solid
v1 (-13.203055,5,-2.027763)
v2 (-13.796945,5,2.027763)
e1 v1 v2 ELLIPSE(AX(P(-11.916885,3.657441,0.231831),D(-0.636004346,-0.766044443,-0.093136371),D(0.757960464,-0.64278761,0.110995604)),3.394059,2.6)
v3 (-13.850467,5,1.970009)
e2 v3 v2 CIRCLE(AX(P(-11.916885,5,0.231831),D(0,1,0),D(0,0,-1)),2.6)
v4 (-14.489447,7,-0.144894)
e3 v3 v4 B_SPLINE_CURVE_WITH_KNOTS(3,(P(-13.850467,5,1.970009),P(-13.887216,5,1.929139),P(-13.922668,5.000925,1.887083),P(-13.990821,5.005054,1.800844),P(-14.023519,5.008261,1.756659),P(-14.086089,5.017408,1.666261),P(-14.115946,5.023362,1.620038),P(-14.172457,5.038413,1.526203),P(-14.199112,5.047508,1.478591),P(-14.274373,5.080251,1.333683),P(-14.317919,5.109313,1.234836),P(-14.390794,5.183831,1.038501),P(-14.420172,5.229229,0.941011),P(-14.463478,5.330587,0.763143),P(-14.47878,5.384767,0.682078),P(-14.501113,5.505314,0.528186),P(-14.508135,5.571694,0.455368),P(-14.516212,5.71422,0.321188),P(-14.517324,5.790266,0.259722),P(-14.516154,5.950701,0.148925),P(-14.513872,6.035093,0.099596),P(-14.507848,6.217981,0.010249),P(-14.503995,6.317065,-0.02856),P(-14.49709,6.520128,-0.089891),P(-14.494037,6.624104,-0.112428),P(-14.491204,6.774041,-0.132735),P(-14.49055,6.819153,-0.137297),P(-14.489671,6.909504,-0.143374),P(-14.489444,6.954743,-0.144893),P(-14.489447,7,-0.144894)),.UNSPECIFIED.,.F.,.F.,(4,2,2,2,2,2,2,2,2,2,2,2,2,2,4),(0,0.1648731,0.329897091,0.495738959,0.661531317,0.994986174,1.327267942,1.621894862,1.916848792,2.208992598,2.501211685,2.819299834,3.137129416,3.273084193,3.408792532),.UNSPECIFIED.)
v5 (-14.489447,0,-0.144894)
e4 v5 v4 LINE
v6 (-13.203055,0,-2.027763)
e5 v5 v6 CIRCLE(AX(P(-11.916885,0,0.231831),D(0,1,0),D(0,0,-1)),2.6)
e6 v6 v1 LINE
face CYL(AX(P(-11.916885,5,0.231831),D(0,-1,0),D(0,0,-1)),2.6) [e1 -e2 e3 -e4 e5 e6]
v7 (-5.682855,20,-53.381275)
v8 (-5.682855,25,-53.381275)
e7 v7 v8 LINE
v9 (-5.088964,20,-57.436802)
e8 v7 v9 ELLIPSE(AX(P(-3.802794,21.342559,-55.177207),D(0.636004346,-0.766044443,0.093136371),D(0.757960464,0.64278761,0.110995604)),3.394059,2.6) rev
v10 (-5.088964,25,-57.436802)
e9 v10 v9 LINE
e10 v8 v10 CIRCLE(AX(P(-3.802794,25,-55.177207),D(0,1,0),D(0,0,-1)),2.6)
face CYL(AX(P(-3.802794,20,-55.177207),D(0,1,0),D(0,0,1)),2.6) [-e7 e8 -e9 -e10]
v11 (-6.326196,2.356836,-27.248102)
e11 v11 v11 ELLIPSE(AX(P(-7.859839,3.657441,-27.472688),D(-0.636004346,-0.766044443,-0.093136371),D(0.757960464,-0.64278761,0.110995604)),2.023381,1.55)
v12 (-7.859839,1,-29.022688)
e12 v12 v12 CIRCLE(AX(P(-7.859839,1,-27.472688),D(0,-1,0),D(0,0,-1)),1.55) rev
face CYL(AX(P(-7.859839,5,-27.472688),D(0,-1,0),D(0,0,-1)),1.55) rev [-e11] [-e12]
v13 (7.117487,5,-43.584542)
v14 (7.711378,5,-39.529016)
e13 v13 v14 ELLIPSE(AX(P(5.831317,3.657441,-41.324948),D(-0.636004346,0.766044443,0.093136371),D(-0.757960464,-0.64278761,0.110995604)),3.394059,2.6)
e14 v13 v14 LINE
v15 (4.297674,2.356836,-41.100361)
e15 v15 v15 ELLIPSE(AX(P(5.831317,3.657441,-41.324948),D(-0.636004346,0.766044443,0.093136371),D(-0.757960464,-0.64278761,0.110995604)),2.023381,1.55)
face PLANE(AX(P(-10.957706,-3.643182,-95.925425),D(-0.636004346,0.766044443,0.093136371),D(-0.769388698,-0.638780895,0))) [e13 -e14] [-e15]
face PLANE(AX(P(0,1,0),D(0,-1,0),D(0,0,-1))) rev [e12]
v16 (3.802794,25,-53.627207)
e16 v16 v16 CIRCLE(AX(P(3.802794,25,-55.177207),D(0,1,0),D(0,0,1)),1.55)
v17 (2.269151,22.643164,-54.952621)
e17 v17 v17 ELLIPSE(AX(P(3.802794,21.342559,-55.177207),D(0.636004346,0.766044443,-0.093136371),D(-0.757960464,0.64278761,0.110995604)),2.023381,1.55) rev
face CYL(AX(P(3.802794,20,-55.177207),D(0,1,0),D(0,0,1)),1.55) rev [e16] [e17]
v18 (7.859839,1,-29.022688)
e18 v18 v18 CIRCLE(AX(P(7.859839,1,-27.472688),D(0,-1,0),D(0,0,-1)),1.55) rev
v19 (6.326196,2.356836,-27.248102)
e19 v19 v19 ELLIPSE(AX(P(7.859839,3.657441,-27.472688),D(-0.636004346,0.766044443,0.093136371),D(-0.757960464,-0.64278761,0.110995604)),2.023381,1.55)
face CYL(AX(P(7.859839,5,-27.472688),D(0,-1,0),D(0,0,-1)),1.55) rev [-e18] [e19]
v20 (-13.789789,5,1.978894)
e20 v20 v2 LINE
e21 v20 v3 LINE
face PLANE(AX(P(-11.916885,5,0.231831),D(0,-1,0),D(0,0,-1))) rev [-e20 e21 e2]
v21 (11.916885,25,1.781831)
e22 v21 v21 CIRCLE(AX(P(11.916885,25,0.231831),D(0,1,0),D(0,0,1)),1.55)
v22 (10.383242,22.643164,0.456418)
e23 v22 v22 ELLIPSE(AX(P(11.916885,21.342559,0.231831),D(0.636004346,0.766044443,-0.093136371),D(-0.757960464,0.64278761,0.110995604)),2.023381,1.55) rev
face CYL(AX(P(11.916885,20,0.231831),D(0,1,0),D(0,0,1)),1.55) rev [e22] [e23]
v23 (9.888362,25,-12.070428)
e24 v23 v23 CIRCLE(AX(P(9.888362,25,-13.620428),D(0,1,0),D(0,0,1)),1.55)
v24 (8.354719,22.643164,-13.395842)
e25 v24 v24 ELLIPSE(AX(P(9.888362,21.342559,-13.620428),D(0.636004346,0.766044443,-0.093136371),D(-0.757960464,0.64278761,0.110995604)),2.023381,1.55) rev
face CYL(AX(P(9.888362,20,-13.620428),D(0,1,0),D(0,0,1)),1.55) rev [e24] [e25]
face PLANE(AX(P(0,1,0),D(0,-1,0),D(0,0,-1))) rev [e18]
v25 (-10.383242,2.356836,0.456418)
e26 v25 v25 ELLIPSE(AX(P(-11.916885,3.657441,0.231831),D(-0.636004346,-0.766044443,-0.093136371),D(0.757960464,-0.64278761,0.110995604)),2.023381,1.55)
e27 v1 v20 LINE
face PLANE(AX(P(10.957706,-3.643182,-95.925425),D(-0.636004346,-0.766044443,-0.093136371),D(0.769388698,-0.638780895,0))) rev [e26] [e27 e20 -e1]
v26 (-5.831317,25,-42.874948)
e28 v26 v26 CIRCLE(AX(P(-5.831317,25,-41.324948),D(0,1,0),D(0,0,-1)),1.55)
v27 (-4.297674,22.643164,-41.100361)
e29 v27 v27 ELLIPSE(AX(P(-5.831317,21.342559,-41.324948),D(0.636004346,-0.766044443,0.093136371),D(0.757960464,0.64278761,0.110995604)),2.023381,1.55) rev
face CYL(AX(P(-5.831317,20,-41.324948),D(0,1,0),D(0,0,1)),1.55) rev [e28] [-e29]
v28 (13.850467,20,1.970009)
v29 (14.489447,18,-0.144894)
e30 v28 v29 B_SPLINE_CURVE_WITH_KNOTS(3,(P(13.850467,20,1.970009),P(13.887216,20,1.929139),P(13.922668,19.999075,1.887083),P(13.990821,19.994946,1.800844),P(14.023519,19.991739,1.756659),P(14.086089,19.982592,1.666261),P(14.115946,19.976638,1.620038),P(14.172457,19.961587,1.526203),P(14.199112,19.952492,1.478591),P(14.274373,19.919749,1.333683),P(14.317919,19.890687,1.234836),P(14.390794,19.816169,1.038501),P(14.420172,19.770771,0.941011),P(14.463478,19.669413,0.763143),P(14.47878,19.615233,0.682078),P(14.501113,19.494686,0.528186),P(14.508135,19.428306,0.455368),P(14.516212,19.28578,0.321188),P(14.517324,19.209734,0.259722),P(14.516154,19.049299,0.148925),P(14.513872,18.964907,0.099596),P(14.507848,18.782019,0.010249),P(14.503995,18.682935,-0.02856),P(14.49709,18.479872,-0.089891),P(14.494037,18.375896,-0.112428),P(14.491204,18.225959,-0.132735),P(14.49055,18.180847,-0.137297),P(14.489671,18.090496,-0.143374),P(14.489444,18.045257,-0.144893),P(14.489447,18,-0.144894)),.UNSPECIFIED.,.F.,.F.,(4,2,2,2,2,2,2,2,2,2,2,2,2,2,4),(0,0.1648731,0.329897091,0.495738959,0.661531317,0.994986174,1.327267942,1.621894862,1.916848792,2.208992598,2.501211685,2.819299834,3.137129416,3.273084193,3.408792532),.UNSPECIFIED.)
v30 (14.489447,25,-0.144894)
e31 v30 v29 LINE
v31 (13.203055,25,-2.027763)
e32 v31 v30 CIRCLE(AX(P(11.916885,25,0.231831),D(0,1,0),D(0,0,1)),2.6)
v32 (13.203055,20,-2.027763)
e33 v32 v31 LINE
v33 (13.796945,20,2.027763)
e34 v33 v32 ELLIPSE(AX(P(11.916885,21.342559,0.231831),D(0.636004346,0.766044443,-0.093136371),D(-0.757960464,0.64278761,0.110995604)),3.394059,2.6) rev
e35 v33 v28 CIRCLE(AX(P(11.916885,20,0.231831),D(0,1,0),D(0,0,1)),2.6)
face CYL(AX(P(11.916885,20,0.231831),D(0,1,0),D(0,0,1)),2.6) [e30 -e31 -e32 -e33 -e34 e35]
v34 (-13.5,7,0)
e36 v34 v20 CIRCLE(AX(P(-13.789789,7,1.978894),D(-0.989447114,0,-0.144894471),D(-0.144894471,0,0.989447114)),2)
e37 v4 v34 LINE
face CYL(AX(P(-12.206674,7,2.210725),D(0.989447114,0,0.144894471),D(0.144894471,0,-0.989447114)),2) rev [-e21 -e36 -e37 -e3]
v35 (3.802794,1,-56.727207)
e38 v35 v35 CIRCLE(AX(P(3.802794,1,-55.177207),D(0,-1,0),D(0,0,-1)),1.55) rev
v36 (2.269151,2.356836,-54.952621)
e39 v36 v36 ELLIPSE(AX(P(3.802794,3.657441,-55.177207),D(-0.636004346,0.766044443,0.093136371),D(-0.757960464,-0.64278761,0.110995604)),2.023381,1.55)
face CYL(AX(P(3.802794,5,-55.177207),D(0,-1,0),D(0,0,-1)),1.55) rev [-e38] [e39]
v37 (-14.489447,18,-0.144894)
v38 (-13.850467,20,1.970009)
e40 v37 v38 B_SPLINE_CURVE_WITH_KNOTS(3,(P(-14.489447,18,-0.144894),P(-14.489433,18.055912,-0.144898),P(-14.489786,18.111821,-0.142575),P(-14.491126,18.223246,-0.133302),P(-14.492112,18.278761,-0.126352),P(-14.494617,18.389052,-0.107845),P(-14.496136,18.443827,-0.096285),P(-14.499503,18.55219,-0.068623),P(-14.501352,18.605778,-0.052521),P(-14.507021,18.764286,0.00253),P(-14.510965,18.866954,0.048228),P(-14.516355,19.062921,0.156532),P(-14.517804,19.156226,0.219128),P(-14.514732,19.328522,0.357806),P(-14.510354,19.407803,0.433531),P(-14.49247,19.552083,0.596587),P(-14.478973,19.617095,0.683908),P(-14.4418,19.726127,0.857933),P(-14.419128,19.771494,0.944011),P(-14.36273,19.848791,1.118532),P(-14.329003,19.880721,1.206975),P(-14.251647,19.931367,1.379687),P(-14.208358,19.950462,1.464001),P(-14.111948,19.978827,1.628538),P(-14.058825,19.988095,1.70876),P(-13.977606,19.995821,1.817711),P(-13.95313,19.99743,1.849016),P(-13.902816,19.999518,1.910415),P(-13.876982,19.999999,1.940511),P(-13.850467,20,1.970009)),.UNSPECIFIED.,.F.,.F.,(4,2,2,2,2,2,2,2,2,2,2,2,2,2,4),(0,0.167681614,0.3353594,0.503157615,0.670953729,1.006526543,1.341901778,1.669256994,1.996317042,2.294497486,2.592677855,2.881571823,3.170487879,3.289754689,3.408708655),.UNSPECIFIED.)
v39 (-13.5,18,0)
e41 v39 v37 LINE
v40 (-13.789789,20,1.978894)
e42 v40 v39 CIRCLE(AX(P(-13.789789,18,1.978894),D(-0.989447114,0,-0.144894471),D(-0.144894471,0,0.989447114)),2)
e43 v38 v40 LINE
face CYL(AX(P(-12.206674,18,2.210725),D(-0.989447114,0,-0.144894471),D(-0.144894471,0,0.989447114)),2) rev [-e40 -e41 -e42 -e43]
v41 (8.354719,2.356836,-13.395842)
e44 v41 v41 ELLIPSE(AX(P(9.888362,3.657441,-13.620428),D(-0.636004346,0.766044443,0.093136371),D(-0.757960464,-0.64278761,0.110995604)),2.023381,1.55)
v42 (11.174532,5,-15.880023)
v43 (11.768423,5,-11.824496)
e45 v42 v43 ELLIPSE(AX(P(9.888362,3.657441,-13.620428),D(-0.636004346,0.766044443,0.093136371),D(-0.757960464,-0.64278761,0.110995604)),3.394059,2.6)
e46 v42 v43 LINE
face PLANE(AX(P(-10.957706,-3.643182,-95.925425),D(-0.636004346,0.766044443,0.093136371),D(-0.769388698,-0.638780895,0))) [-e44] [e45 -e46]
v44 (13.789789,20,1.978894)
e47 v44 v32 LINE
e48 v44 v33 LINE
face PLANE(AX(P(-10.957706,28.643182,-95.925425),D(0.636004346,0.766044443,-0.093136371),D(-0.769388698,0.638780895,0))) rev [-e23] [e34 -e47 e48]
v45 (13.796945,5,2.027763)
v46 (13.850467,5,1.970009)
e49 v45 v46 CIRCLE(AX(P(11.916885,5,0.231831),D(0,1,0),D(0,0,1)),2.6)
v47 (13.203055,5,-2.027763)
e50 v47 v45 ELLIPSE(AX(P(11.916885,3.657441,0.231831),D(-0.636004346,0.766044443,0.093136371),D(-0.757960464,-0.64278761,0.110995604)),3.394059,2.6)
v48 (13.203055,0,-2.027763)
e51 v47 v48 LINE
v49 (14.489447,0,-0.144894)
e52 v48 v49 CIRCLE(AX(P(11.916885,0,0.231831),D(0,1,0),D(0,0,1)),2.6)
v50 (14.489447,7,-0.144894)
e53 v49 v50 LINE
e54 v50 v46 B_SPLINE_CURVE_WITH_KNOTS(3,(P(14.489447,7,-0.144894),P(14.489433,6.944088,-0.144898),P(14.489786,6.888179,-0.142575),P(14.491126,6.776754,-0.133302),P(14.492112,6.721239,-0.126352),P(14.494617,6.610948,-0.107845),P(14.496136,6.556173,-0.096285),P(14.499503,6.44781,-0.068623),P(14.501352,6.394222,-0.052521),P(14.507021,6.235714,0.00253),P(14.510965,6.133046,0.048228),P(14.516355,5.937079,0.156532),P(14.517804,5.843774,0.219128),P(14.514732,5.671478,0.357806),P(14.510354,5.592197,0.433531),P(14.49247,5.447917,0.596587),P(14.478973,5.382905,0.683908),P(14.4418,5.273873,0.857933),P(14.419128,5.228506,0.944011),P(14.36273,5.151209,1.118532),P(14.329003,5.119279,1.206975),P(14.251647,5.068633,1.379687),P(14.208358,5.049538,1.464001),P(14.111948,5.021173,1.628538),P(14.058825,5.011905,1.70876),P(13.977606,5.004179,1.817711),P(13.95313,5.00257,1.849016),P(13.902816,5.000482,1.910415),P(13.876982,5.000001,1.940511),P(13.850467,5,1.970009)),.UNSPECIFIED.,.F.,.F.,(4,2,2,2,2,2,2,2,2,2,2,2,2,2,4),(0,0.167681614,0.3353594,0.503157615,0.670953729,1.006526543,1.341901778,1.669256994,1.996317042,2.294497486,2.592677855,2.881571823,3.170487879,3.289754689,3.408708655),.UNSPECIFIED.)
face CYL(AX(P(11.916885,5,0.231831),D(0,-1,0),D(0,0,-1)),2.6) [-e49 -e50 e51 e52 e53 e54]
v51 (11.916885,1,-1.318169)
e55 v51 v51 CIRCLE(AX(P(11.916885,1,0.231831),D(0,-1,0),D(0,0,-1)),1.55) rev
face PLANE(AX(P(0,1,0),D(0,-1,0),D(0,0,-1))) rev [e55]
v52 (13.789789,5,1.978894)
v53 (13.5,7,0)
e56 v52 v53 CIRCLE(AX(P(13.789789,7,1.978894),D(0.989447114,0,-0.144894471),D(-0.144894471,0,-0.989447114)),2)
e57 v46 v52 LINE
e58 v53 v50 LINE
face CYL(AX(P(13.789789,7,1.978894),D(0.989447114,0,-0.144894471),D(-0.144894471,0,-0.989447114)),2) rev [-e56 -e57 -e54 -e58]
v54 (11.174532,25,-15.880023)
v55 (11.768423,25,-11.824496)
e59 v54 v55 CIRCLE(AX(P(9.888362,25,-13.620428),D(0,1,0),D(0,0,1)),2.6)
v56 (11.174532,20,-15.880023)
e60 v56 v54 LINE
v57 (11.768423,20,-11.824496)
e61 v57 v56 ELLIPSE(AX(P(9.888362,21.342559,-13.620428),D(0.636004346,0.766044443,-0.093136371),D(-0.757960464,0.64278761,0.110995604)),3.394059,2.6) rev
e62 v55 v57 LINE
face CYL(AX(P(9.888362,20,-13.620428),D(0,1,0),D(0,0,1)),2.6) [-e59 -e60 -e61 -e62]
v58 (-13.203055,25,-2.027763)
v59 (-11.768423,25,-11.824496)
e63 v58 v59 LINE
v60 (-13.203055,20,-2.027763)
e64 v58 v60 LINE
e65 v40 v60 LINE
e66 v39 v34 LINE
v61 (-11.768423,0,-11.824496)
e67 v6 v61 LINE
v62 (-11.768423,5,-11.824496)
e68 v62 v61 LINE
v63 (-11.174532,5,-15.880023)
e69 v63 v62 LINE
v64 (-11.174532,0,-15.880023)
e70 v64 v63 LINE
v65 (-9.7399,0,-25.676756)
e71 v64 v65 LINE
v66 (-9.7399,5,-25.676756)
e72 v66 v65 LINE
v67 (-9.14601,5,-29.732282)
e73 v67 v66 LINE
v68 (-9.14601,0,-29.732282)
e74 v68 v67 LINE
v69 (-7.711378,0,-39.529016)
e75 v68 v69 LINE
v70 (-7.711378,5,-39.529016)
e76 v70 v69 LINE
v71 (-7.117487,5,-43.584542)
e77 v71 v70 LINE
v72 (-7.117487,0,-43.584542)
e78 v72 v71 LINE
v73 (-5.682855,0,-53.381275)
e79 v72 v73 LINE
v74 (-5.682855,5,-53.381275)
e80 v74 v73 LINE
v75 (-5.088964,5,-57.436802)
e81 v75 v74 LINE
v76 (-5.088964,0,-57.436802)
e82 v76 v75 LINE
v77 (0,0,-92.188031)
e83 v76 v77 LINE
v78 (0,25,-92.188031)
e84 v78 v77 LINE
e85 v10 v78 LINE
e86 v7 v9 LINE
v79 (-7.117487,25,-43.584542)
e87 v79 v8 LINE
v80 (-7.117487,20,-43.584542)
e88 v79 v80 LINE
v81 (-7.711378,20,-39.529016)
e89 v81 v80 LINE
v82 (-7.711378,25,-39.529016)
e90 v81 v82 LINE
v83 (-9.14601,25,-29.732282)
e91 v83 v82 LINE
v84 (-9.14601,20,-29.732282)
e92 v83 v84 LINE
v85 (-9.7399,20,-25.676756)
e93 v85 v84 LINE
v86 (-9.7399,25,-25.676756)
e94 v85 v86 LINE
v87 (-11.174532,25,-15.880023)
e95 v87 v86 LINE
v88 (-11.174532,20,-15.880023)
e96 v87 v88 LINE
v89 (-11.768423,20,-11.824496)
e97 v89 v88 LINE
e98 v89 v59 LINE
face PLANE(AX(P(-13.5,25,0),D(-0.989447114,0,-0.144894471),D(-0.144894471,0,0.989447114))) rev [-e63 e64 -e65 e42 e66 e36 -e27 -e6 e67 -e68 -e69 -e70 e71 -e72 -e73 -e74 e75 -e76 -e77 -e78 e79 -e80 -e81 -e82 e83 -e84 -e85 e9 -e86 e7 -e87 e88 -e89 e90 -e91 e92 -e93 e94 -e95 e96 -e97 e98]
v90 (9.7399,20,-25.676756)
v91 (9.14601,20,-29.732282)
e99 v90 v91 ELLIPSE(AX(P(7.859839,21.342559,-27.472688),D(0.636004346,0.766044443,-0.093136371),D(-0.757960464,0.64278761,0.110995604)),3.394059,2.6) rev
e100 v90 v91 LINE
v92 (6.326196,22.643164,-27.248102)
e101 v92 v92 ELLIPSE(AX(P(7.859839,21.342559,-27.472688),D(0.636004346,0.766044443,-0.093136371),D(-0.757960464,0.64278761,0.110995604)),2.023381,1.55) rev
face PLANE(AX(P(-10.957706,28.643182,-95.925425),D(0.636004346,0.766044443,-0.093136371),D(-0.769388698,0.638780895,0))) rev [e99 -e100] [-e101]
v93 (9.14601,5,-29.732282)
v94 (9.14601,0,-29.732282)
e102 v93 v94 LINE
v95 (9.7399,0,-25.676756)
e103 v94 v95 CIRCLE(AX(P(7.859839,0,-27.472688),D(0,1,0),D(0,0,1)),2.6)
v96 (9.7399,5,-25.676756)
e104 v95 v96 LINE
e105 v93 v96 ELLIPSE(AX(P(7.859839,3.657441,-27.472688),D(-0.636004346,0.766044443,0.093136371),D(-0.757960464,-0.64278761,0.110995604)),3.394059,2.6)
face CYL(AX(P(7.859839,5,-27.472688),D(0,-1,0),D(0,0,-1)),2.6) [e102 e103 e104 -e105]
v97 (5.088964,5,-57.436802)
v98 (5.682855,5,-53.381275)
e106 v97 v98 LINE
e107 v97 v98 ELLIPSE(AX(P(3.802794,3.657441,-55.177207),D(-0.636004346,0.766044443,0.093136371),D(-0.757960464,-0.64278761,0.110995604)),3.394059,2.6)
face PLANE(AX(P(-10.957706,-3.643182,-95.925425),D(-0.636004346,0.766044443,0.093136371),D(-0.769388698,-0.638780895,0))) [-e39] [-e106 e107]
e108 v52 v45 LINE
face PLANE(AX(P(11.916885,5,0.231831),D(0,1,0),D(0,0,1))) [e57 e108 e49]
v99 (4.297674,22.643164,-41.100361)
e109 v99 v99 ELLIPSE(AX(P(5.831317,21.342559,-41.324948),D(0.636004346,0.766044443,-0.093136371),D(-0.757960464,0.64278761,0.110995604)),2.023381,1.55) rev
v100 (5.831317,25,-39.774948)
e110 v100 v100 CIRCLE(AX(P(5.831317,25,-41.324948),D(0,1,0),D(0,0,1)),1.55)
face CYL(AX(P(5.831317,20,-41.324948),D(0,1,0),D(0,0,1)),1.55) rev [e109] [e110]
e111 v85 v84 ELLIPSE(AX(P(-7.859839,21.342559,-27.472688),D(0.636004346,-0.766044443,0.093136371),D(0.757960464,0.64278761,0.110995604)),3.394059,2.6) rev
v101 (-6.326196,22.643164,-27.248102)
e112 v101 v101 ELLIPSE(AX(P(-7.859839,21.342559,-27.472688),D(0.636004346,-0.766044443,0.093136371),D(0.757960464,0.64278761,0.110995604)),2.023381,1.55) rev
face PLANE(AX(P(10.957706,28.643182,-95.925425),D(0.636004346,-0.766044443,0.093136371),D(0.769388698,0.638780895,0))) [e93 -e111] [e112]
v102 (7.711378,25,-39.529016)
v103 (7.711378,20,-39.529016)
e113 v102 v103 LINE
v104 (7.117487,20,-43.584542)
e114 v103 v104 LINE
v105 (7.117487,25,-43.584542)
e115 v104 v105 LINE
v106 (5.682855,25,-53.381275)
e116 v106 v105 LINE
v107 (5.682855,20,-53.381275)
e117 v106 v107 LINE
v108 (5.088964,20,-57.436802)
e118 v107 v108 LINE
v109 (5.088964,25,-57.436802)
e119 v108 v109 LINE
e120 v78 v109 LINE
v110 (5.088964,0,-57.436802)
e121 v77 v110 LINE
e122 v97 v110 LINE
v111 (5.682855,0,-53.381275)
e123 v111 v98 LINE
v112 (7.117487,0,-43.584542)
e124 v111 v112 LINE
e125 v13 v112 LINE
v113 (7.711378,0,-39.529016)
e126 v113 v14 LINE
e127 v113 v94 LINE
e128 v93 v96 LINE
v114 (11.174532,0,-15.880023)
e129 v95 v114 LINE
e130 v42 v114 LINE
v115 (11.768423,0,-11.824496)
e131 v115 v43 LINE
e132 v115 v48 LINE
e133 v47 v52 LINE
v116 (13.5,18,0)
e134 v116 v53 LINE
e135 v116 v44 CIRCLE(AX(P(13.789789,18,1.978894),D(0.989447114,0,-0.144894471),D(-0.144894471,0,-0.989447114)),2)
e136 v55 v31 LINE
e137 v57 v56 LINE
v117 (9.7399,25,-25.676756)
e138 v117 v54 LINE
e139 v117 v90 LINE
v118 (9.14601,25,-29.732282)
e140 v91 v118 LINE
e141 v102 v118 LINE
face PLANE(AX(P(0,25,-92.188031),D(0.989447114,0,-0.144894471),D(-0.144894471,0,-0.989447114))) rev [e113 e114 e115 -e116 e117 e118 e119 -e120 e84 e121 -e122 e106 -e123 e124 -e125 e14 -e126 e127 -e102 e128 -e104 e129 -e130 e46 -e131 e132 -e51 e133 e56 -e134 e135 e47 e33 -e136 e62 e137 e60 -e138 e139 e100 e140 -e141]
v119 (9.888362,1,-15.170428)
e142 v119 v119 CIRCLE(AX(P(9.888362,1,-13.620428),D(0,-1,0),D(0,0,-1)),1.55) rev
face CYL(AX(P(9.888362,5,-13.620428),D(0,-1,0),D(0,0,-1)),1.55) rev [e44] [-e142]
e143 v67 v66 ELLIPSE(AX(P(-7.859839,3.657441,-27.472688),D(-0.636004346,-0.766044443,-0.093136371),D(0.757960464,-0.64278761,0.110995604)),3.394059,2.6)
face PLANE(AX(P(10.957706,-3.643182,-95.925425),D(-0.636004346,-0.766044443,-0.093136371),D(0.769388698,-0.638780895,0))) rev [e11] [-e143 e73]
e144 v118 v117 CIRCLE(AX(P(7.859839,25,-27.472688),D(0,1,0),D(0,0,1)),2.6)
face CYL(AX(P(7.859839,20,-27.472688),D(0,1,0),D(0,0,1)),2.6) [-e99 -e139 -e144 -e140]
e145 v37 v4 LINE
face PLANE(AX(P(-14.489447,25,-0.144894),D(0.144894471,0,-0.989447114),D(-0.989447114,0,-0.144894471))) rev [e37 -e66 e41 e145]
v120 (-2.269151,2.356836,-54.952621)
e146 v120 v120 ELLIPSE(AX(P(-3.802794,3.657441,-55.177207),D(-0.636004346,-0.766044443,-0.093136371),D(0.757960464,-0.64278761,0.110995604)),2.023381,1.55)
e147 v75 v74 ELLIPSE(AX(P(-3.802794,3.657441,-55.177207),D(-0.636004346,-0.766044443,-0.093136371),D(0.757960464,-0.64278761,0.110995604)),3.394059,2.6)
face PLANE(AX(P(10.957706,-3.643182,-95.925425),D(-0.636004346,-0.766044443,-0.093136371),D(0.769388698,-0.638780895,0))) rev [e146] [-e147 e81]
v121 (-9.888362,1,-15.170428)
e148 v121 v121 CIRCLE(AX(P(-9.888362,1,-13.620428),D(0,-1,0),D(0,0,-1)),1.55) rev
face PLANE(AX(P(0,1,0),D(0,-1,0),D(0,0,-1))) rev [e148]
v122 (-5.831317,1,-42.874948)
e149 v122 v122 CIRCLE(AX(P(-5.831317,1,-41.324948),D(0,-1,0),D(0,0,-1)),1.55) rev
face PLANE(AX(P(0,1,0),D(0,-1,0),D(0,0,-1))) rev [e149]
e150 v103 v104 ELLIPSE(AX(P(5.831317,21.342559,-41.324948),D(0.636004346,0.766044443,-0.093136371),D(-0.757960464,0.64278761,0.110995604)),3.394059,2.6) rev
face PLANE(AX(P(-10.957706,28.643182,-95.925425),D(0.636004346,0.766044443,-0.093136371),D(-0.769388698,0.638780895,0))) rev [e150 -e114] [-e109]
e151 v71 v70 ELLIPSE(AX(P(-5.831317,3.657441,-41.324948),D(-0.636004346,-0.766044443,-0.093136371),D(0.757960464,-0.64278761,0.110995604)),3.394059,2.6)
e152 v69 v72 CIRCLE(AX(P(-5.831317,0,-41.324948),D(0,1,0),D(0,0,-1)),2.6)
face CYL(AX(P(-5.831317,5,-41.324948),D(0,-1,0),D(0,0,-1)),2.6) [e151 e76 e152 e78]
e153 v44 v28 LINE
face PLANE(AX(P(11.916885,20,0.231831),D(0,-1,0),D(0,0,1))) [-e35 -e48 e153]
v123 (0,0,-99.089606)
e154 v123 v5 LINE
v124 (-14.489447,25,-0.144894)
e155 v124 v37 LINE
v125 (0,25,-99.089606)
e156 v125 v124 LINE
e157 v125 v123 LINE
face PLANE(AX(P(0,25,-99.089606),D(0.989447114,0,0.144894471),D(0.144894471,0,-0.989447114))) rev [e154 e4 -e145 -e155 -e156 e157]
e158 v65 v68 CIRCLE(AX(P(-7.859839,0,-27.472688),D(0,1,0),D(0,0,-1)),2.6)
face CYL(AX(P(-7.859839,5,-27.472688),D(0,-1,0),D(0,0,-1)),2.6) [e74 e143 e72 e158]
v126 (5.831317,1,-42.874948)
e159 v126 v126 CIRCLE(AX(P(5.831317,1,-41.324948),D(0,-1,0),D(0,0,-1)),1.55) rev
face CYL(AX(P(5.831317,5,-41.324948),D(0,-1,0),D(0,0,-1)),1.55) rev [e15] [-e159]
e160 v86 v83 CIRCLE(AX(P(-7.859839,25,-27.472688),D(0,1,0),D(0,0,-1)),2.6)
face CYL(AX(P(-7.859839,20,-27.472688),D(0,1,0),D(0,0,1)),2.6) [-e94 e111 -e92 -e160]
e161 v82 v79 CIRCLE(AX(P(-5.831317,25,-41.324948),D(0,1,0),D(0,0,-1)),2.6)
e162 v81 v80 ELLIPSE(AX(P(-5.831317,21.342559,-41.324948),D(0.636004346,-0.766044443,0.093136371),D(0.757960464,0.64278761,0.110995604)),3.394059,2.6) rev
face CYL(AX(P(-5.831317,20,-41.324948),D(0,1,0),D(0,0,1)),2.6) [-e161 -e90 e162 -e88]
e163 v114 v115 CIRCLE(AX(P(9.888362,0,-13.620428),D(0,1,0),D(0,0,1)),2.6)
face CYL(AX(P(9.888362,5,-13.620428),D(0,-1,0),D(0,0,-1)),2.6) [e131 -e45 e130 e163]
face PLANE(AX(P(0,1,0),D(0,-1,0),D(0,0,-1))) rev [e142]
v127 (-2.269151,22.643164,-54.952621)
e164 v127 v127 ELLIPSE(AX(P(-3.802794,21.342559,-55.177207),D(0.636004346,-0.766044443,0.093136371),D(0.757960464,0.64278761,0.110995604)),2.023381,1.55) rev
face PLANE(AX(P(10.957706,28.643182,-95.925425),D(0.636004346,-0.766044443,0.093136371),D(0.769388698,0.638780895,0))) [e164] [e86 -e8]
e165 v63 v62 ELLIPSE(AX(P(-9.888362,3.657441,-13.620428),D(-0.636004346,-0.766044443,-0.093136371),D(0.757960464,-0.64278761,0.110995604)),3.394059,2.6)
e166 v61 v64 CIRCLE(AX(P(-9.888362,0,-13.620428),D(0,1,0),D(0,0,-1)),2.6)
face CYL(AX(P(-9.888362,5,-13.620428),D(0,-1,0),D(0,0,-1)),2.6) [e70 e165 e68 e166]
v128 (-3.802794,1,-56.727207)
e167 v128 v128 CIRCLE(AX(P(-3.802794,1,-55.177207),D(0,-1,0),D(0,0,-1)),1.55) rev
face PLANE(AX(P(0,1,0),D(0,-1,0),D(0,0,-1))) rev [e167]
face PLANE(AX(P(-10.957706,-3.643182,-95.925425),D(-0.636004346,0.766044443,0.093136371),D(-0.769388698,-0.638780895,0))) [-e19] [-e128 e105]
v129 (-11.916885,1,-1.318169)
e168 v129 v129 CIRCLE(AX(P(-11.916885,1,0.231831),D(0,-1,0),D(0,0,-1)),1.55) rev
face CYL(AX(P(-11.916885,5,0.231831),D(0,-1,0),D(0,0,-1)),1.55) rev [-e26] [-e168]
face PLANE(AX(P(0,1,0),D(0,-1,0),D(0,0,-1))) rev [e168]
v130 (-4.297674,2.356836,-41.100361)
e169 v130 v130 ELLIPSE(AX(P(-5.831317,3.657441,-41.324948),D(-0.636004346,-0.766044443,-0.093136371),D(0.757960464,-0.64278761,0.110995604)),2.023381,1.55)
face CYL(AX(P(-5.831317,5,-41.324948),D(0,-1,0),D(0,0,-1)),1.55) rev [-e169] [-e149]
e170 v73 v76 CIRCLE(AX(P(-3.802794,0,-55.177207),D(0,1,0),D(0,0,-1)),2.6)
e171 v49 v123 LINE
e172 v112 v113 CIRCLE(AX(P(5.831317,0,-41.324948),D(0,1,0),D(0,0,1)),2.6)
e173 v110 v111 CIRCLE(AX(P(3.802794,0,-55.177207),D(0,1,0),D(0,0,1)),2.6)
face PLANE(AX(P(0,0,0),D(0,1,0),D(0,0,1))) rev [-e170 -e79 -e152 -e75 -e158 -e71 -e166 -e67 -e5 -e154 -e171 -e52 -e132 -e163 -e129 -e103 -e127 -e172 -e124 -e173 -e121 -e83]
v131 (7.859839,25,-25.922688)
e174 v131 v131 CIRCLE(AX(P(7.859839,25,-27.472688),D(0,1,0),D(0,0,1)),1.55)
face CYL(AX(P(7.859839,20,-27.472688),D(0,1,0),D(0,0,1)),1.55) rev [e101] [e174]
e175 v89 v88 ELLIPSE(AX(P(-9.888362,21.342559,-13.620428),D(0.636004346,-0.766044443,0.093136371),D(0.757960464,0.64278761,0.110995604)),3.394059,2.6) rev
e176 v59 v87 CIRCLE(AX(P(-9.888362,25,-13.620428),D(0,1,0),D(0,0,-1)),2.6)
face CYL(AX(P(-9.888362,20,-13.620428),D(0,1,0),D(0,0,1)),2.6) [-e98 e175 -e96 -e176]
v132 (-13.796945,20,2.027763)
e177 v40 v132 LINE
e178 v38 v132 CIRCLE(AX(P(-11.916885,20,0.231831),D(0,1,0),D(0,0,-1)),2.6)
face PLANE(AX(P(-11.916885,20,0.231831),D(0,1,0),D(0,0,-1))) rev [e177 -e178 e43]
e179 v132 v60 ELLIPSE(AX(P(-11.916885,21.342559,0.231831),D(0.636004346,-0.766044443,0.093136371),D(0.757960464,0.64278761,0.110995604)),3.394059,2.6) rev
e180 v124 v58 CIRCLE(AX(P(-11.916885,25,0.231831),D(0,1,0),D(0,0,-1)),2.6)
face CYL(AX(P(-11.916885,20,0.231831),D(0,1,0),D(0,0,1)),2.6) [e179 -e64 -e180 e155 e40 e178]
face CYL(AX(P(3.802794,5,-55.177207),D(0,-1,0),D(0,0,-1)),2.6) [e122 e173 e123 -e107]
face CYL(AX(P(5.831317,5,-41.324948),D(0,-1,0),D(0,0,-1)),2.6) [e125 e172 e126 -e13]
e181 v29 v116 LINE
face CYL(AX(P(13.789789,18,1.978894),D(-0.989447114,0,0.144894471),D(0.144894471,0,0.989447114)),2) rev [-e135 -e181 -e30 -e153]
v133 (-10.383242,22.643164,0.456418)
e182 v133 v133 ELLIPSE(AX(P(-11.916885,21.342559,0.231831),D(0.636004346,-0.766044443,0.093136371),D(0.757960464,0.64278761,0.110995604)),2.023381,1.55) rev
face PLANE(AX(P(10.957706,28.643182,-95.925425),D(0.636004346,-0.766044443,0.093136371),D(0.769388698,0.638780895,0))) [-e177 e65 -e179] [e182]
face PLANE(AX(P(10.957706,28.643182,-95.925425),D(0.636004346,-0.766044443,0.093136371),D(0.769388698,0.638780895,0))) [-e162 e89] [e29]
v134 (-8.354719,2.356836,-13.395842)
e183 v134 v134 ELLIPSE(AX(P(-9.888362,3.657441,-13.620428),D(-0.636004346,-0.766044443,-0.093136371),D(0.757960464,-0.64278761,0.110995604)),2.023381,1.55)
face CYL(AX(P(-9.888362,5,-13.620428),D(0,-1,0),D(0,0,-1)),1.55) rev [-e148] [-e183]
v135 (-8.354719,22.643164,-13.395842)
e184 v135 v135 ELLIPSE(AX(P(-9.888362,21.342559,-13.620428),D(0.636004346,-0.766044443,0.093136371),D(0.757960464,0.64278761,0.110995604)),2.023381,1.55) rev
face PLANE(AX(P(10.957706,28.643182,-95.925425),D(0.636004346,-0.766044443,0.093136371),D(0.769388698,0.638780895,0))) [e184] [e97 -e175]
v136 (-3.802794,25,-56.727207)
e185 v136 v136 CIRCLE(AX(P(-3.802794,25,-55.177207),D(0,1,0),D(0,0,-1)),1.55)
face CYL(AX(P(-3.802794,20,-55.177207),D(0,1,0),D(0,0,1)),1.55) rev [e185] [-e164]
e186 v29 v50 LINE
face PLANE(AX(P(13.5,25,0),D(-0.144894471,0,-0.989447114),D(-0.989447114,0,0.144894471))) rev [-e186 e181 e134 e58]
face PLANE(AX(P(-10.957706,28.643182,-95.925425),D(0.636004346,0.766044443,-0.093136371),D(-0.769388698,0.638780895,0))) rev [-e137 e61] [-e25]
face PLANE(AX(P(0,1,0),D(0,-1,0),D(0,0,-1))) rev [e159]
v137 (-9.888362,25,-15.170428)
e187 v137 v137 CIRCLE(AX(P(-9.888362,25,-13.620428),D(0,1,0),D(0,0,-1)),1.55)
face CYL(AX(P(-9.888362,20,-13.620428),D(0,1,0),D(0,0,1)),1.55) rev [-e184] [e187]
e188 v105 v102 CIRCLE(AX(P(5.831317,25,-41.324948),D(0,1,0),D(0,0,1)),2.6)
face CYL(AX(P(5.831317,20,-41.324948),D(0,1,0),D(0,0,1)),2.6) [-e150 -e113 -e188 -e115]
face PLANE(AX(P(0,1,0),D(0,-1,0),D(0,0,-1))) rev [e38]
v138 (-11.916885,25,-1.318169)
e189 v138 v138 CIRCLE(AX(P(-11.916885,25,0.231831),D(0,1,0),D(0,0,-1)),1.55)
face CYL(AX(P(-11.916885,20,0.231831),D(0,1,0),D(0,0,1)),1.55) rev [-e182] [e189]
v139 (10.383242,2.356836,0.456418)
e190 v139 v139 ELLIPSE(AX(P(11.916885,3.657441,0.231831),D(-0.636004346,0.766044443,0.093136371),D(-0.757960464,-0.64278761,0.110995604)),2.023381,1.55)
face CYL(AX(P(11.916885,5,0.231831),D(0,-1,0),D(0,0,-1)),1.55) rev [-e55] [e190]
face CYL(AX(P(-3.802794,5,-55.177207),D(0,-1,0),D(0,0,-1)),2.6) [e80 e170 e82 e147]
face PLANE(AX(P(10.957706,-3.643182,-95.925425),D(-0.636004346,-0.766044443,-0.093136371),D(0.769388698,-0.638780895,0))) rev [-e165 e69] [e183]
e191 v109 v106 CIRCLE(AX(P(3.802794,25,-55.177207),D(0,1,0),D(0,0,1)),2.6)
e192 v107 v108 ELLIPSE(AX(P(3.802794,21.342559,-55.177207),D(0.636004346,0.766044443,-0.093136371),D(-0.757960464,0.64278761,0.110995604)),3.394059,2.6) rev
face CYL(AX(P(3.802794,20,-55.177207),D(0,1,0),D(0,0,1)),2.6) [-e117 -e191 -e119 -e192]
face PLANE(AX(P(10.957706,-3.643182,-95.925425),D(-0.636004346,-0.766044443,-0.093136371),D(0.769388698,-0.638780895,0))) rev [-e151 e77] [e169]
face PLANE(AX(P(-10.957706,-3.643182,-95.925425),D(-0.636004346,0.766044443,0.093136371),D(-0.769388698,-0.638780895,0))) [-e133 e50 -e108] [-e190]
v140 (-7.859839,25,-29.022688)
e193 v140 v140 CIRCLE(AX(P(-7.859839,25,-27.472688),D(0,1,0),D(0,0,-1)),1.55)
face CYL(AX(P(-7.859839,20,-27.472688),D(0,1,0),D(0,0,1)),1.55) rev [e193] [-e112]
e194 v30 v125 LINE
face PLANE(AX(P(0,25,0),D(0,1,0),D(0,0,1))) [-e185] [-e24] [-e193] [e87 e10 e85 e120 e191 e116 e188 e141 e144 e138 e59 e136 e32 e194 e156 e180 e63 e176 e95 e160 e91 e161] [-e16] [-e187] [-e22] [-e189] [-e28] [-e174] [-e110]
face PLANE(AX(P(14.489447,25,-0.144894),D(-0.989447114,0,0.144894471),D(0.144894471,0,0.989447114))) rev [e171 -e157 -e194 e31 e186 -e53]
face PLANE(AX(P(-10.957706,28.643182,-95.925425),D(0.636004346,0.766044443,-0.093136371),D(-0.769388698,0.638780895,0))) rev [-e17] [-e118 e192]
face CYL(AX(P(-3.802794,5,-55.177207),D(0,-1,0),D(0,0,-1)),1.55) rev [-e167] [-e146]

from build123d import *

# Parameters (mm, degrees)
BOSS_EXTRUDE1_DEPTH            = 25
SKETCH2_R                      = 2.6
SKETCH2_R_2                    = 1.55
BOSS_EXTRUDE3_DEPTH            = 5
CUT_EXTRUDE1_REACH             = 107.119
CUT_EXTRUDE1_DIRECTION_2_DEPTH = 106.119492302
CUT_EXTRUDE2_REACH             = 107.119
CUT_EXTRUDE2_DIRECTION_2_DEPTH = 106.119492302
FILLET1_R                      = 2
SKETCH6_R                      = 1.55
BOSS_EXTRUDE4_DEPTH            = 1


with BuildPart() as part:
    # Sketch1 → Boss-Extrude1 (new body)
    with BuildSketch(Plane(origin=(0, 0, 0), x_dir=(1, 0, 0), z_dir=(0, 1, 0))):
        Polygon((-13.5, 0), (0, 92.188031325), (13.5, 0), (14.489447114, 0.144894471), (0, 99.089605913), (-14.489447114, 0.144894471), align=None)
    extrude(amount=BOSS_EXTRUDE1_DEPTH)

    # Sketch2 → Boss-Extrude3 (add)
    # profile 1 of 10: a face of its own
    with BuildSketch(Plane(origin=(0, 0, 0), x_dir=(1, 0, 0), z_dir=(0, 1, 0))):
        with Locations((11.916884617, -0.231831154)):
            Circle(SKETCH2_R)
        with Locations(Location((11.916884617, -0.231831154, 0), (0, 0, 270))):
            Circle(SKETCH2_R_2, mode=Mode.SUBTRACT)
    # profile 2 of 10: a face of its own
    with BuildSketch(Plane(origin=(0, 0, 0), x_dir=(1, 0, 0), z_dir=(0, 1, 0))):
        with Locations((9.888362021, 13.620428448)):
            Circle(SKETCH2_R)
        with Locations(Location((9.888362021, 13.620428448, 0), (0, 0, 270))):
            Circle(SKETCH2_R_2, mode=Mode.SUBTRACT)
    # profile 3 of 10: a face of its own
    with BuildSketch(Plane(origin=(0, 0, 0), x_dir=(1, 0, 0), z_dir=(0, 1, 0))):
        with Locations((7.859839425, 27.47268805)):
            Circle(SKETCH2_R)
        with Locations(Location((7.859839425, 27.47268805, 0), (0, 0, 270))):
            Circle(SKETCH2_R_2, mode=Mode.SUBTRACT)
    # profile 4 of 10: a face of its own
    with BuildSketch(Plane(origin=(0, 0, 0), x_dir=(1, 0, 0), z_dir=(0, 1, 0))):
        with Locations((5.831316829, 41.324947652)):
            Circle(SKETCH2_R)
        with Locations(Location((5.831316829, 41.324947652, 0), (0, 0, 270))):
            Circle(SKETCH2_R_2, mode=Mode.SUBTRACT)
    # profile 5 of 10: a face of its own
    with BuildSketch(Plane(origin=(0, 0, 0), x_dir=(1, 0, 0), z_dir=(0, 1, 0))):
        with Locations((3.802794233, 55.177207254)):
            Circle(SKETCH2_R)
        with Locations(Location((3.802794233, 55.177207254, 0), (0, 0, 270))):
            Circle(SKETCH2_R_2, mode=Mode.SUBTRACT)
    # profile 6 of 10: a face of its own
    with BuildSketch(Plane(origin=(0, 0, 0), x_dir=(1, 0, 0), z_dir=(0, 1, 0))):
        with Locations((-11.916884617, -0.231831154)):
            Circle(SKETCH2_R)
        with Locations(Location((-11.916884617, -0.231831154, 0), (0, 0, 90))):
            Circle(SKETCH2_R_2, mode=Mode.SUBTRACT)
    # profile 7 of 10: a face of its own
    with BuildSketch(Plane(origin=(0, 0, 0), x_dir=(1, 0, 0), z_dir=(0, 1, 0))):
        with Locations((-9.888362021, 13.620428448)):
            Circle(SKETCH2_R)
        with Locations(Location((-9.888362021, 13.620428448, 0), (0, 0, 90))):
            Circle(SKETCH2_R_2, mode=Mode.SUBTRACT)
    # profile 8 of 10: a face of its own
    with BuildSketch(Plane(origin=(0, 0, 0), x_dir=(1, 0, 0), z_dir=(0, 1, 0))):
        with Locations((-7.859839425, 27.47268805)):
            Circle(SKETCH2_R)
        with Locations(Location((-7.859839425, 27.47268805, 0), (0, 0, 90))):
            Circle(SKETCH2_R_2, mode=Mode.SUBTRACT)
    # profile 9 of 10: a face of its own
    with BuildSketch(Plane(origin=(0, 0, 0), x_dir=(1, 0, 0), z_dir=(0, 1, 0))):
        with Locations((-5.831316829, 41.324947652)):
            Circle(SKETCH2_R)
        with Locations(Location((-5.831316829, 41.324947652, 0), (0, 0, 90))):
            Circle(SKETCH2_R_2, mode=Mode.SUBTRACT)
    # profile 10 of 10: a face of its own
    with BuildSketch(Plane(origin=(0, 0, 0), x_dir=(1, 0, 0), z_dir=(0, 1, 0))):
        with Locations((-3.802794233, 55.177207254)):
            Circle(SKETCH2_R)
        with Locations(Location((-3.802794233, 55.177207254, 0), (0, 0, 90))):
            Circle(SKETCH2_R_2, mode=Mode.SUBTRACT)
    boss_extrude3 = extrude(amount=BOSS_EXTRUDE3_DEPTH)

    # Cut-Extrude1: up to this face of the body (flat: up to its plane)
    cut_extrude1_end = Plane(part.part.faces().sort_by_distance((-6.65824674, 12.912249129, -46.7205751))[0])
    # Sketch4 → Cut-Extrude1 (cut, up to the picked face)
    with BuildSketch(Plane(origin=(0.283424505, 0, 1.935433121), x_dir=(0.9894471144188783, 0, -0.14489447114419254), z_dir=(0.14489447114419252, 0, 0.9894471144188782)), mode=Mode.PRIVATE) as cut_extrude1_sk1:
        Polygon((13.357536045, 5), (9.157536045, 5), (9.157536045, 1.475781549), align=None)
    cut_extrude1_tool1 = split(extrude(cut_extrude1_sk1.sketch, amount=-CUT_EXTRUDE1_REACH, mode=Mode.PRIVATE), bisect_by=cut_extrude1_end, keep=Keep.BOTH, mode=Mode.PRIVATE)
    cut_extrude1 = cut_extrude1_tool1.solids().sort_by(Axis((10.729548, 3.825261, 0.405705), (-0.14489447114419252, 0, -0.9894471144188782)))[0]
    add(cut_extrude1, mode=Mode.SUBTRACT)

    # Sketch4 → Cut-Extrude1 direction 2 (cut)
    with BuildSketch(Plane(origin=(0.283424505, 0, 1.935433121), x_dir=(0.9894471144188783, 0, -0.14489447114419254), z_dir=(0.14489447114419252, 0, 0.9894471144188782))):
        Polygon((13.357536045, 5), (9.157536045, 5), (9.157536045, 1.475781549), align=None)
    cut_extrude1_direction_2 = extrude(amount=CUT_EXTRUDE1_DIRECTION_2_DEPTH, mode=Mode.SUBTRACT)

    # Cut-Extrude2: up to this face of the body (flat: up to its plane)
    cut_extrude2_end = Plane(part.part.faces().sort_by_distance((6.65824674, 12.912249129, -46.7205751))[0])
    # Sketch5 → Cut-Extrude2 (cut, up to the picked face)
    with BuildSketch(Plane(origin=(-0.283424505, 0, 1.935433121), x_dir=(0.9894471144188784, 0, 0.14489447114419146), z_dir=(-0.14489447114419146, 0, 0.9894471144188784)), mode=Mode.PRIVATE) as cut_extrude2_sk1:
        Polygon((-9.157536045, 5), (-9.157536045, 1.475781549), (-13.357536045, 5), align=None)
    cut_extrude2_tool1 = split(extrude(cut_extrude2_sk1.sketch, amount=-CUT_EXTRUDE2_REACH, mode=Mode.PRIVATE), bisect_by=cut_extrude2_end, keep=Keep.BOTH, mode=Mode.PRIVATE)
    cut_extrude2 = cut_extrude2_tool1.solids().sort_by(Axis((-10.729548, 3.825261, 0.405705), (0.14489447114419146, 0, -0.9894471144188784)))[0]
    add(cut_extrude2, mode=Mode.SUBTRACT)

    # Sketch5 → Cut-Extrude2 direction 2 (cut)
    with BuildSketch(Plane(origin=(-0.283424505, 0, 1.935433121), x_dir=(0.9894471144188784, 0, 0.14489447114419146), z_dir=(-0.14489447114419146, 0, 0.9894471144188784))):
        Polygon((-9.157536045, 5), (-9.157536045, 1.475781549), (-13.357536045, 5), align=None)
    cut_extrude2_direction_2 = extrude(amount=CUT_EXTRUDE2_DIRECTION_2_DEPTH, mode=Mode.SUBTRACT)

    # Mirror2: Boss-Extrude3, Cut-Extrude1, Cut-Extrude1 direction 2, Cut-Extrude2, Cut-Extrude2 direction 2 across plane
    add(boss_extrude3.mirror(Plane.ZX.offset(12.5)))
    add(cut_extrude1.mirror(Plane.ZX.offset(12.5)), mode=Mode.SUBTRACT)
    add(cut_extrude1_direction_2.mirror(Plane.ZX.offset(12.5)), mode=Mode.SUBTRACT)
    add(cut_extrude2.mirror(Plane.ZX.offset(12.5)), mode=Mode.SUBTRACT)
    add(cut_extrude2_direction_2.mirror(Plane.ZX.offset(12.5)), mode=Mode.SUBTRACT)

    # Fillet1
    # the kernel refuses this fillet: 2 mm, written as the material it adds along each edge
    with BuildSketch(Plane(origin=(13.5, 5, 0), x_dir=(0, 1, 0), z_dir=(0.9894471144188783, 0, -0.1448944711441925))) as fillet1_piece_1_section:
        with BuildLine():
            CenterArc((FILLET1_R, FILLET1_R), FILLET1_R, 180, 90)
            Line((0, FILLET1_R), (0, 0))
            Line((0, 0), (FILLET1_R, 0))
        make_face()
    fillet1_piece_1 = extrude(amount=6, mode=Mode.PRIVATE)
    fillet1_piece_1 = fillet1_piece_1 & Plane(origin=(11.916884617, 5, 0.231831154), x_dir=(1, 0, 0), z_dir=(0, -1, 0)) * Cylinder(2.6, 20, mode=Mode.PRIVATE)
    add(fillet1_piece_1)
    with BuildSketch(Plane(origin=(13.5, 20, 0), x_dir=(0, -1, 0), z_dir=(0.9894471144188783, 0, -0.1448944711441925))) as fillet1_piece_2_section:
        with BuildLine():
            CenterArc((FILLET1_R, -FILLET1_R), FILLET1_R, 90, 90)
            Line((0, -FILLET1_R), (0, 0))
            Line((0, 0), (FILLET1_R, 0))
        make_face()
    fillet1_piece_2 = extrude(amount=6, mode=Mode.PRIVATE)
    fillet1_piece_2 = fillet1_piece_2 & Plane(origin=(11.916884617, 20, 0.231831154), x_dir=(1, 0, 0), z_dir=(0, 1, 0)) * Cylinder(2.6, 20, mode=Mode.PRIVATE)
    add(fillet1_piece_2)
    with BuildSketch(Plane(origin=(-19.436682687, 20, -0.869366827), x_dir=(0, -1, 0), z_dir=(0.9894471144188784, 0, 0.1448944711441914))) as fillet1_piece_3_section:
        with BuildLine():
            CenterArc((FILLET1_R, -FILLET1_R), FILLET1_R, 90, 90)
            Line((0, -FILLET1_R), (0, 0))
            Line((0, 0), (FILLET1_R, 0))
        make_face()
    fillet1_piece_3 = extrude(amount=6, mode=Mode.PRIVATE)
    fillet1_piece_3 = fillet1_piece_3 & Plane(origin=(-11.916884617, 20, 0.231831154), x_dir=(1, 0, 0), z_dir=(0, 1, 0)) * Cylinder(2.6, 21, mode=Mode.PRIVATE)
    add(fillet1_piece_3)
    with BuildSketch(Plane(origin=(-19.436682687, 5, -0.869366827), x_dir=(-0.1448944711441914, 0, 0.9894471144188784), z_dir=(0.9894471144188784, 0, 0.1448944711441914))) as fillet1_piece_4_section:
        with BuildLine():
            CenterArc((FILLET1_R, -FILLET1_R), FILLET1_R, 90, 90)
            Line((0, -FILLET1_R), (0, 0))
            Line((0, 0), (FILLET1_R, 0))
        make_face()
    fillet1_piece_4 = extrude(amount=6, mode=Mode.PRIVATE)
    fillet1_piece_4 = fillet1_piece_4 & Plane(origin=(-11.916884617, 5, 0.231831154), x_dir=(1, 0, 0), z_dir=(0, -1, 0)) * Cylinder(2.6, 21, mode=Mode.PRIVATE)
    add(fillet1_piece_4)

    # Sketch6 → Boss-Extrude4 (add)
    with BuildSketch(Plane.XZ):
        with Locations(Location((3.802794233, -55.177207254, 0), (0, 0, 270))):
            Circle(SKETCH6_R)
        with Locations(Location((-3.802794233, -55.177207254, 0), (0, 0, 270))):
            Circle(SKETCH6_R)
        with Locations(Location((-5.831316829, -41.324947652, 0), (0, 0, 270))):
            Circle(SKETCH6_R)
        with Locations(Location((5.831316829, -41.324947652, 0), (0, 0, 270))):
            Circle(SKETCH6_R)
        with Locations(Location((7.859839425, -27.47268805, 0), (0, 0, 270))):
            Circle(SKETCH6_R)
        with Locations(Location((-7.859839425, -27.47268805, 0), (0, 0, 270))):
            Circle(SKETCH6_R)
        with Locations(Location((-9.888362021, -13.620428448, 0), (0, 0, 270))):
            Circle(SKETCH6_R)
        with Locations(Location((9.888362021, -13.620428448, 0), (0, 0, 270))):
            Circle(SKETCH6_R)
        with Locations(Location((11.916884617, 0.231831154, 0), (0, 0, 270))):
            Circle(SKETCH6_R)
        with Locations(Location((-11.916884617, 0.231831154, 0), (0, 0, 270))):
            Circle(SKETCH6_R)
    extrude(amount=-BOSS_EXTRUDE4_DEPTH)


solid = part.part
